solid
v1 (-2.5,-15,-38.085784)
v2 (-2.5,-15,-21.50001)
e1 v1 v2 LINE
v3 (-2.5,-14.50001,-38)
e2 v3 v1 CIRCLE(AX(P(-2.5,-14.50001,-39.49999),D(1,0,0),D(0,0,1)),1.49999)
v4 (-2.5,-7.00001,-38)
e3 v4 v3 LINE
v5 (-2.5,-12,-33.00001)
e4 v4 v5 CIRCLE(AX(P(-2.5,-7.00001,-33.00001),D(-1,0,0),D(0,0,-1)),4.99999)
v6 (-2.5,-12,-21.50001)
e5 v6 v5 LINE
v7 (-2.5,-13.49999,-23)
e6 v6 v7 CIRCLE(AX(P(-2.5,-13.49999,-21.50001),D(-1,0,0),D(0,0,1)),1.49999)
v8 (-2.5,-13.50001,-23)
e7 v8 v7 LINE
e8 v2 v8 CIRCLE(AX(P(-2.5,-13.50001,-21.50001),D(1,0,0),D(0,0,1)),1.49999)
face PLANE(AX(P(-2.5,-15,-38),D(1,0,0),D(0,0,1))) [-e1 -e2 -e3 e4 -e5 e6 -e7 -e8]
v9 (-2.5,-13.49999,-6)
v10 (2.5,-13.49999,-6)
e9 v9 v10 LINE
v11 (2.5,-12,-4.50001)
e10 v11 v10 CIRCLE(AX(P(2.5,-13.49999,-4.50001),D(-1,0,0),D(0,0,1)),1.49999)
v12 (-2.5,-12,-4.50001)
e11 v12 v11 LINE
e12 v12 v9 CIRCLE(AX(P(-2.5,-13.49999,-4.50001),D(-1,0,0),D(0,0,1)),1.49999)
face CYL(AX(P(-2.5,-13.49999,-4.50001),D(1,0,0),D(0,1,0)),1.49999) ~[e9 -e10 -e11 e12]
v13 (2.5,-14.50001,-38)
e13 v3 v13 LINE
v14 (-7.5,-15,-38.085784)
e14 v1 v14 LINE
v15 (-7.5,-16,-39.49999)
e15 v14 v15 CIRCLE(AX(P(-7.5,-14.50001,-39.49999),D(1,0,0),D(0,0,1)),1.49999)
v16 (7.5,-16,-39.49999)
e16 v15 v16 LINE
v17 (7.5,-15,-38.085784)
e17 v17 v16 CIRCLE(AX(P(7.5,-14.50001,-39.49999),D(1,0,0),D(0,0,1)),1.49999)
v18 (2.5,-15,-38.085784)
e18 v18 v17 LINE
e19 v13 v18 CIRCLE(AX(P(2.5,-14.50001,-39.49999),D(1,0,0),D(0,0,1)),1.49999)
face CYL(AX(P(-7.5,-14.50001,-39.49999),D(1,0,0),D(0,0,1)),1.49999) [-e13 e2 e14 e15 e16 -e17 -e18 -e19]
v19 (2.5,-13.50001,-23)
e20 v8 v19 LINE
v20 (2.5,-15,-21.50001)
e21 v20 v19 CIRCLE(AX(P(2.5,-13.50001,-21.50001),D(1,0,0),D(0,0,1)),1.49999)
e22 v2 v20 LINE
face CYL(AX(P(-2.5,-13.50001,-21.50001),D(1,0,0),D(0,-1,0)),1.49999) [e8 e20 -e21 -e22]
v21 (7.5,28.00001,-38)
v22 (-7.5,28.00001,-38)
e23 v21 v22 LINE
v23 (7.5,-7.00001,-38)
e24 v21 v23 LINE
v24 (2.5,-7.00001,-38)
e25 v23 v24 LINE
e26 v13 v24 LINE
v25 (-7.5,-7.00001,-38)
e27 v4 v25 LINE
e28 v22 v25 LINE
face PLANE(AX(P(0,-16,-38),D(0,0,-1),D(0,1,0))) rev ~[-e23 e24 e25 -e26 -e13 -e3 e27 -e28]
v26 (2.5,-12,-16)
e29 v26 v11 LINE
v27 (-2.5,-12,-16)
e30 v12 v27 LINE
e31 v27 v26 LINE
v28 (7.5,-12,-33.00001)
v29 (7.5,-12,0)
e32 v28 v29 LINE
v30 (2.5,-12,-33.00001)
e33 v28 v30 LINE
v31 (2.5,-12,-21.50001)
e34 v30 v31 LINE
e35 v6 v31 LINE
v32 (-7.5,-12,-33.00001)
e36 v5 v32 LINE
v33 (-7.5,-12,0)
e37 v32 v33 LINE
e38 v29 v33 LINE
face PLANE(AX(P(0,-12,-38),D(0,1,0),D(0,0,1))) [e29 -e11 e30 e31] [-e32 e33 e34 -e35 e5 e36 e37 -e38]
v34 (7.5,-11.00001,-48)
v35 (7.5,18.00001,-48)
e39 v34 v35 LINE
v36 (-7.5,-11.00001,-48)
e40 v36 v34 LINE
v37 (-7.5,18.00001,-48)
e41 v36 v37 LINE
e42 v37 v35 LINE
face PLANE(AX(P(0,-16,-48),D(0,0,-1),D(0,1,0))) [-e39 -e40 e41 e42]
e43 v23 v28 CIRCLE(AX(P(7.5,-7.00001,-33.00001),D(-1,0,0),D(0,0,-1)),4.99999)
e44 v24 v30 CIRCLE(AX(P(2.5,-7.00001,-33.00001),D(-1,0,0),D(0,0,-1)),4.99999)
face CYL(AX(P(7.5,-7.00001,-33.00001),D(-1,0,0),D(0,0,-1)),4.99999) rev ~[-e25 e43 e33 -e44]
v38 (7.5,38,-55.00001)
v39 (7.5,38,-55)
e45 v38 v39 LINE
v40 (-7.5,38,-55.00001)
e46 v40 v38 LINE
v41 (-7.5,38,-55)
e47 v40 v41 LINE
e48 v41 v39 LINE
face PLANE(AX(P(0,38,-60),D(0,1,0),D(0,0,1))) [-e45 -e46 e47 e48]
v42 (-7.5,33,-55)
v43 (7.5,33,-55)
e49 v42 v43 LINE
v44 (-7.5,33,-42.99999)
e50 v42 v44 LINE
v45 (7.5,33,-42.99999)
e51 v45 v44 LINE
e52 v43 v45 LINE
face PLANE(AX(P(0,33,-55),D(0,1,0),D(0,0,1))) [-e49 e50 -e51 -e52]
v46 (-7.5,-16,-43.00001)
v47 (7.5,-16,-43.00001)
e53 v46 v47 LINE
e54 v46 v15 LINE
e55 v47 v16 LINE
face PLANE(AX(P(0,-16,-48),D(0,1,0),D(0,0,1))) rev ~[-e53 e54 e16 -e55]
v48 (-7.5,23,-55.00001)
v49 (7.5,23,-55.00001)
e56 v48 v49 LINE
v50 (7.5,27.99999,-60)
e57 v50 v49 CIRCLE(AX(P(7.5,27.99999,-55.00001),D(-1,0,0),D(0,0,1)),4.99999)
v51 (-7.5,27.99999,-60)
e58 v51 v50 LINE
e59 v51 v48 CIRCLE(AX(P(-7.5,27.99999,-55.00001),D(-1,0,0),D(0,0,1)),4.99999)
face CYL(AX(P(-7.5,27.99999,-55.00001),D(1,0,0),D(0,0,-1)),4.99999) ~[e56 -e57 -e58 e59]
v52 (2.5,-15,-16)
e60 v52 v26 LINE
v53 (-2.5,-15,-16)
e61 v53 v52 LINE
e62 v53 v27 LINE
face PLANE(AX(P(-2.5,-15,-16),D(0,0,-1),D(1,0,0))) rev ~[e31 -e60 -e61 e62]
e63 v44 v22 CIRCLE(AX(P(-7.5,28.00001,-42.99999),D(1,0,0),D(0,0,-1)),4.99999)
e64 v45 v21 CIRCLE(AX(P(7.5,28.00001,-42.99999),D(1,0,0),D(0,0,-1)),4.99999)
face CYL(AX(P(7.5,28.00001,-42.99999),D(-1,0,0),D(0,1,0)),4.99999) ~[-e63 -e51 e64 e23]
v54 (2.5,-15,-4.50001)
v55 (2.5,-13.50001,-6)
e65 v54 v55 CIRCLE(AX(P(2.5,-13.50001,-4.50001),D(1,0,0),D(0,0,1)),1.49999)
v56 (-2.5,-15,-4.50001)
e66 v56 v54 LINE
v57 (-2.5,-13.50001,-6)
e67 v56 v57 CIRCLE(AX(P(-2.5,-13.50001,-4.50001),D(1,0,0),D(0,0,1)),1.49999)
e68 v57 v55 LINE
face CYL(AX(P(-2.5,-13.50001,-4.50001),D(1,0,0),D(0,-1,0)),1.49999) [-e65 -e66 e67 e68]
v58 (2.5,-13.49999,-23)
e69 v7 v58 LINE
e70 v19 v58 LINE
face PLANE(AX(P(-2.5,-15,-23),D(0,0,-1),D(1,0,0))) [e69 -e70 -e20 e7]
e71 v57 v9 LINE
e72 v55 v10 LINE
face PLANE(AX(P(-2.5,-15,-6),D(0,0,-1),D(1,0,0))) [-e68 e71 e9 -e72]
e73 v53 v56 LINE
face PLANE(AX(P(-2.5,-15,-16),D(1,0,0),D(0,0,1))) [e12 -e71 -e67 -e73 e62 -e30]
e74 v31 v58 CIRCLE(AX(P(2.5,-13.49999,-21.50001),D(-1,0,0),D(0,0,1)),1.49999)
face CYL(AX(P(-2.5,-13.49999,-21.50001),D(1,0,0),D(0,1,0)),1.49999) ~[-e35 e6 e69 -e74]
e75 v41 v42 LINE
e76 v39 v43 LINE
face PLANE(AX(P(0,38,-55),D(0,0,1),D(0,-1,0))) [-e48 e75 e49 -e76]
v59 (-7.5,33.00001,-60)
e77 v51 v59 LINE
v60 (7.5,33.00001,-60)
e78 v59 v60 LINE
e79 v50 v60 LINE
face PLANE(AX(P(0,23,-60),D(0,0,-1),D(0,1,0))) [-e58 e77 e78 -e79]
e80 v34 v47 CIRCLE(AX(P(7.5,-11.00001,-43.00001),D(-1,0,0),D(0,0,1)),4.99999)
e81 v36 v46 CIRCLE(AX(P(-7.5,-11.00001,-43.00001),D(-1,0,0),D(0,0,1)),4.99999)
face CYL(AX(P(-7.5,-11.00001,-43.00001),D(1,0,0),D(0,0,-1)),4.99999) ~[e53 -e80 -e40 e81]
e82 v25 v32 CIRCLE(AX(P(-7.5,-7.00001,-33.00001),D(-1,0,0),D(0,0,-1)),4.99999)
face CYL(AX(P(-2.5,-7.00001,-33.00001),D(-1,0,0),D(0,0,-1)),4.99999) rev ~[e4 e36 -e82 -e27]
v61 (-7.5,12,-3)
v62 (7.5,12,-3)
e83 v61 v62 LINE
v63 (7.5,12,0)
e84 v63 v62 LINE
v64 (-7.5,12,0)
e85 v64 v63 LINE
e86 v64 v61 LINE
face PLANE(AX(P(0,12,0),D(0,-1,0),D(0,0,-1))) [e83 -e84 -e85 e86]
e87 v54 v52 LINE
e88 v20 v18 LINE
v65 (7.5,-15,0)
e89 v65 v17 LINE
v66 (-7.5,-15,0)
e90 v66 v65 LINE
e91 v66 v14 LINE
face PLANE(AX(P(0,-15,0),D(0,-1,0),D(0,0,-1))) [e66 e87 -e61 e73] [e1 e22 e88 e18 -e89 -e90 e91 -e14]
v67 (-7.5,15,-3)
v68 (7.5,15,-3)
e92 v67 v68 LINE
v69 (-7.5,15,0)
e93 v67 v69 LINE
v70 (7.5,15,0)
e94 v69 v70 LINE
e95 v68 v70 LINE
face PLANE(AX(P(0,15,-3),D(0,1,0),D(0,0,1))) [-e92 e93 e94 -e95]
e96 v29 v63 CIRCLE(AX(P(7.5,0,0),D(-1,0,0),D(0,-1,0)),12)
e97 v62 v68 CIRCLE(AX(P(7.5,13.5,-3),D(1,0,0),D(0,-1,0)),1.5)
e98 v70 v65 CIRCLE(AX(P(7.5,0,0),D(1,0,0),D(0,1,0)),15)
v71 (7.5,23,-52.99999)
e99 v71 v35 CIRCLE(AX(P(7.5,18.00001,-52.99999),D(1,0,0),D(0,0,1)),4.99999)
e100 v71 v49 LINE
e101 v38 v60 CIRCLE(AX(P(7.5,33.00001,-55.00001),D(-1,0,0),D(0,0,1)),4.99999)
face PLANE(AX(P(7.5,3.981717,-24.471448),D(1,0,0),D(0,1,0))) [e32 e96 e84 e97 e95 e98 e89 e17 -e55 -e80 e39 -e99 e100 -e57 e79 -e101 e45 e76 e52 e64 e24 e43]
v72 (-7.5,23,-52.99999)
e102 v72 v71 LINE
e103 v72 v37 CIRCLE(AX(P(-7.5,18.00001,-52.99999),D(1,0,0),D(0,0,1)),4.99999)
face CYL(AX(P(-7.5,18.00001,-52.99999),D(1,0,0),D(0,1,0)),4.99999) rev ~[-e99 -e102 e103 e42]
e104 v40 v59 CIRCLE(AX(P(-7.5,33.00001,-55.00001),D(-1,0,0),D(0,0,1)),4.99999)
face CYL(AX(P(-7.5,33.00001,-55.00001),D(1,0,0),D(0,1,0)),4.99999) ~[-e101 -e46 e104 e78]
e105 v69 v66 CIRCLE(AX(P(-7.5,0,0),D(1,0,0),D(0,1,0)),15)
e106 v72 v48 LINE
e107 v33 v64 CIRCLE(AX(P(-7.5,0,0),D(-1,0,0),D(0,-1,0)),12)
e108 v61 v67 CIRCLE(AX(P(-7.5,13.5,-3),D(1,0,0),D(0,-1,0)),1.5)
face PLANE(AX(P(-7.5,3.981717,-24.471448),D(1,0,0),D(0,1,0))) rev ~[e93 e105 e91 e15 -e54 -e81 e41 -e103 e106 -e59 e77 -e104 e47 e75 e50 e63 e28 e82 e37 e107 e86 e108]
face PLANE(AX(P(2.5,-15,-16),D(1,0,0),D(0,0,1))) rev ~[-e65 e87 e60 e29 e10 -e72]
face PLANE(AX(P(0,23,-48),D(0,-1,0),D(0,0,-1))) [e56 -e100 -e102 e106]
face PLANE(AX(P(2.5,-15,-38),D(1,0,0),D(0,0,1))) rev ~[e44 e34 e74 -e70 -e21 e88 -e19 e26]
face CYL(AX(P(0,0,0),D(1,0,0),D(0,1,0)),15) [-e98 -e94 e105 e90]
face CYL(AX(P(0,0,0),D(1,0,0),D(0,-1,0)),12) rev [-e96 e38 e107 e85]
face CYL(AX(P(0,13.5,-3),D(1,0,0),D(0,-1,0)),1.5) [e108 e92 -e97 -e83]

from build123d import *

# Parameters (mm, degrees)
F0_W          = 1
F0_H          = 10
F1_DEPTH      = 7.5
F1_DEPTH_BACK = 7.5
F2_W          = 5
F2_H          = 10
F2_H_2        = 15
F3_DEPTH      = 3
F4_R          = 1.49999
F5_R          = 4.99999


# Not quite as in the source:
# - a fillet or chamfer is up to 0.001 mm smaller than in the source, because OpenCascade refuses the exact size


with BuildPart() as f1:
    # F0 (on Right) → F1 (new body, two sides)
    with BuildSketch(Plane.YZ) as f1_sk:
        with BuildLine():
            ThreePointArc((-12, 0), (0, 12), (12, 0))
            Line((12, 0), (12, -3))
            ThreePointArc((12, -3), (13.5, -4.5), (15, -3))
            Line((15, -3), (15, 0))
            ThreePointArc((15, 0), (0, 15), (-15, 0))
            Line((-15, 0), (-15, -38))
            Line((-15, -38), (-15, -48))
            Line((-15, -48), (-12, -48))
            Line((-12, -48), (23, -48))
            Line((23, -48), (23, -60))
            Line((23, -60), (33, -60))
            Line((33, -60), (38, -60))
            Line((38, -60), (38, -55))
            Line((38, -55), (33, -55))
            Line((33, -55), (33, -48))
            Line((33, -48), (33, -38))
            Line((33, -38), (-12, -38))
            Line((-12, -38), (-12, 0))
        make_face()
        with Locations((-15.5, -43)):
            Rectangle(F0_W, F0_H)
    extrude(amount=F1_DEPTH)
    extrude(f1_sk.sketch, amount=-F1_DEPTH_BACK)

    # F2 (on face) → F3 (cut, through all)
    with BuildSketch(Plane.XZ.offset(15)):
        with Locations((0, -11)):
            Rectangle(F2_W, F2_H)
        with Locations((0, -30.5)):
            Rectangle(F2_W, F2_H_2)
    extrude(amount=-F3_DEPTH, mode=Mode.SUBTRACT)

    # F4 (radius 1.5 in the source; OpenCascade refuses exactly that, so slightly less here)
    f4_edges = [f1.edges().sort_by_distance(p)[0] for p in [
        (0, -15, -6),
        (0, -12, -6),
        (0, -15, -23),
        (0, -12, -23),
        (0, -16, -38),
    ]]
    fillet(f4_edges, radius=F4_R)

    # F5 (radius 5 in the source; OpenCascade refuses exactly that, so slightly less here)
    f5_edges = [f1.edges().sort_by_distance(p)[0] for p in [
        (5, -12, -38),
        (-5, -12, -38),
        (0, 33, -38),
        (0, 38, -60),
        (0, 23, -60),
        (0, 23, -48),
        (0, -15, 0),
        (0, -16, -48),
    ]]
    fillet(f5_edges, radius=F5_R)


solid = f1.part
